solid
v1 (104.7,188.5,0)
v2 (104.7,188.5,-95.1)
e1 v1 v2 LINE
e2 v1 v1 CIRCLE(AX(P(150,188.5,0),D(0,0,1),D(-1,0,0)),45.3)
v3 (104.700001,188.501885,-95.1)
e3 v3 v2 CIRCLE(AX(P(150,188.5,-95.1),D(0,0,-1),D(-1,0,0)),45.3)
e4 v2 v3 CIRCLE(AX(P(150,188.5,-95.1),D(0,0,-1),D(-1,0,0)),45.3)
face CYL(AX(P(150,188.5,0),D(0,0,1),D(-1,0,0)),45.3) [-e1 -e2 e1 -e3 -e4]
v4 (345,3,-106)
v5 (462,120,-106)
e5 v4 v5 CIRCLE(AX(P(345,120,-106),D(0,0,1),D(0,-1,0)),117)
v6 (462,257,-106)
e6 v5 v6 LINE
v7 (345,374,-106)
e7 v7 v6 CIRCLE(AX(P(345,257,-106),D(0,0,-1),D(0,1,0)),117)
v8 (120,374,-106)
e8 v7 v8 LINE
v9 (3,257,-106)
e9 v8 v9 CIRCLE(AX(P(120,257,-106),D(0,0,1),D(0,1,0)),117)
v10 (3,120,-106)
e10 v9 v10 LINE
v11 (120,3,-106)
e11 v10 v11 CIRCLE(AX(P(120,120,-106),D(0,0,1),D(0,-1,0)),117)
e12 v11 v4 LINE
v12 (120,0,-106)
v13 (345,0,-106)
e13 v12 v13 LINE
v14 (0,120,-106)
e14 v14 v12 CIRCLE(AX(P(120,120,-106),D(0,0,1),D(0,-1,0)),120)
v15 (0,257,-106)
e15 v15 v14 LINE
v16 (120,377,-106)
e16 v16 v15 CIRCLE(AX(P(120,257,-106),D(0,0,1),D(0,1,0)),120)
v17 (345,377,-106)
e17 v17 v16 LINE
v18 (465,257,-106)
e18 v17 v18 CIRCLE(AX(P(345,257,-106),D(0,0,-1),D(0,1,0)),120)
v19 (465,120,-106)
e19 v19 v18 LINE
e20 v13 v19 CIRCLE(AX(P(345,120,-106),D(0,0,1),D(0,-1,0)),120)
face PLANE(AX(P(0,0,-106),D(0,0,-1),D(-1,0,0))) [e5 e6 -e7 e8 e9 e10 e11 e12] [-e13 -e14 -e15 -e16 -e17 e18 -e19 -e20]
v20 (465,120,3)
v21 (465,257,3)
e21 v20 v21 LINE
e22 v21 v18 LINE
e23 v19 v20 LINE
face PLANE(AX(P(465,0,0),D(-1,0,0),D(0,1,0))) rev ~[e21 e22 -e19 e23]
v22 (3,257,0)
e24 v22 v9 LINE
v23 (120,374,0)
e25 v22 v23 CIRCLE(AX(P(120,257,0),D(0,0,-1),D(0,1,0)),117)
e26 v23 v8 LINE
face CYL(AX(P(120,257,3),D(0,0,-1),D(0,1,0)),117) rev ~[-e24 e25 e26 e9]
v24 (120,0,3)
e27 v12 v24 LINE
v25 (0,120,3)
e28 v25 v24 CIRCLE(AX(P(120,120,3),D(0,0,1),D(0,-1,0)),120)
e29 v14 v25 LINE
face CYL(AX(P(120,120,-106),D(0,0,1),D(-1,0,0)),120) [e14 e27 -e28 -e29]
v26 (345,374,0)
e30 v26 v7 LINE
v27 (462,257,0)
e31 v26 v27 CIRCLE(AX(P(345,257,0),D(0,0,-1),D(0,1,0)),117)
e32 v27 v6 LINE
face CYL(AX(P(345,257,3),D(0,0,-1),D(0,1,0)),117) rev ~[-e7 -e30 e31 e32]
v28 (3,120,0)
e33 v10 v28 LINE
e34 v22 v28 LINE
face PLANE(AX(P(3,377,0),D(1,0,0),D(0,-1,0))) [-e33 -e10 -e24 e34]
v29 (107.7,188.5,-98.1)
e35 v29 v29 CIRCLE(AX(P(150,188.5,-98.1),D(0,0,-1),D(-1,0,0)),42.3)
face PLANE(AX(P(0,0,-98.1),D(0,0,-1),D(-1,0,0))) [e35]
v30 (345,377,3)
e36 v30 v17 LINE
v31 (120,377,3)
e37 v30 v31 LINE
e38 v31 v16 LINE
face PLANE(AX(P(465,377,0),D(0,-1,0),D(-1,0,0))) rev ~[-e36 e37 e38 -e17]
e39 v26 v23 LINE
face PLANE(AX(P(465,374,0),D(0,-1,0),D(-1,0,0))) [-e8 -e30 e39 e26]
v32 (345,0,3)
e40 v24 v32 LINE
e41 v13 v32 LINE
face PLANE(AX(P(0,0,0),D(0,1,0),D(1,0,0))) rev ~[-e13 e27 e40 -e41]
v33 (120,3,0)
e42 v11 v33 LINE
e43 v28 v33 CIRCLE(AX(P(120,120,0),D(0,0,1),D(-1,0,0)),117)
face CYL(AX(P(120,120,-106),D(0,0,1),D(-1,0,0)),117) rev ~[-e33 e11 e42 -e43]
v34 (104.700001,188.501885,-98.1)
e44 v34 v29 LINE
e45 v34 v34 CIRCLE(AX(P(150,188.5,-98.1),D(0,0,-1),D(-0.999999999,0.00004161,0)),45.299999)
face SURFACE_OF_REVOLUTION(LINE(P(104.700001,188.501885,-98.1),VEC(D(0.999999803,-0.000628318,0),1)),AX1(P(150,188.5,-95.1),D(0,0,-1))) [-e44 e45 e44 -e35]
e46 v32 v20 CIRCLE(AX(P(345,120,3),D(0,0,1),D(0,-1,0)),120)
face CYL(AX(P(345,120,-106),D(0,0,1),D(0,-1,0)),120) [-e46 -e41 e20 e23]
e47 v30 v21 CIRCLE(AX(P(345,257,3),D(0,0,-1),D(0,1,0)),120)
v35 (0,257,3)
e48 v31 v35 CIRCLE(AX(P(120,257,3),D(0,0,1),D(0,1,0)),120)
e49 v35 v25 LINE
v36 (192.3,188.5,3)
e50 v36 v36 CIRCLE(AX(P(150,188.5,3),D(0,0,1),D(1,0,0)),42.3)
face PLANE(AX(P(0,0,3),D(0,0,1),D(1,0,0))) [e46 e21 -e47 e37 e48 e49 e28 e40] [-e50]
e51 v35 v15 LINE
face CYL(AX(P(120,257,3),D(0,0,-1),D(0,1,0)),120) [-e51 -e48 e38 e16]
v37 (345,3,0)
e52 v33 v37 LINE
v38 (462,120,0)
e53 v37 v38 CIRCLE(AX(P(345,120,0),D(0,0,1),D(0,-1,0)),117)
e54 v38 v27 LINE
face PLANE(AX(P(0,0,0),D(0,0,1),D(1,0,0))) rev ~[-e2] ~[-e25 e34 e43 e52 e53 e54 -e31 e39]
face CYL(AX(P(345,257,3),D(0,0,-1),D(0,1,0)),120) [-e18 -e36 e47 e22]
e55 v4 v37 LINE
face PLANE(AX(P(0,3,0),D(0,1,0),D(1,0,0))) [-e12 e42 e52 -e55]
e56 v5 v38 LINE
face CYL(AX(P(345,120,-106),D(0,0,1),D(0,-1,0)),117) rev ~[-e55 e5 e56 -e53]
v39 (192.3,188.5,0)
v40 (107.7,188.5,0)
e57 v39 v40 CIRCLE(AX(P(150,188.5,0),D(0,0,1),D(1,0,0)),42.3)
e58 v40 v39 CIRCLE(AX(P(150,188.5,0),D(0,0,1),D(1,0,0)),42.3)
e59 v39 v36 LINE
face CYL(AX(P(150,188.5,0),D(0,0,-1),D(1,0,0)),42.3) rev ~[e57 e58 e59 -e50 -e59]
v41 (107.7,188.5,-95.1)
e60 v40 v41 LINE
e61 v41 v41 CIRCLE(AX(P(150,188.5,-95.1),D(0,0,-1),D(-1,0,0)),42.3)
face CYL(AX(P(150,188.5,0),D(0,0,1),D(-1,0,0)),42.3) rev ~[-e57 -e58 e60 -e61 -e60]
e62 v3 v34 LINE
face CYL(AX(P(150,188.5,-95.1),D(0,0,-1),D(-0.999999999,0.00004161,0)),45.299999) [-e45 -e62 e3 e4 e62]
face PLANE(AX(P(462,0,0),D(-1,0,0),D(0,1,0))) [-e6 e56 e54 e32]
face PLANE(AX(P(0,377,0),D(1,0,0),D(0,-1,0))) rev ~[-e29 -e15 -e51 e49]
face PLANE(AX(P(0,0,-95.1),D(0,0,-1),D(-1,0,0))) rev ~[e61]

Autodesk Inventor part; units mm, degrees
ref_plane "YZ Plane" through (0, 0, 0) normal (1, 0, 0) x (0, 1, 0)
ref_plane "XZ Plane" through (0, 0, 0) normal (0, 1, 0) x (-1, 0, 0)
ref_plane "XY Plane" through (0, 0, 0) normal (0, 0, 1) x (1, 0, 0)
sketch "Sketch1" plane through (0, 0, 0) normal (0, 0, 1) x (1, 0, 0)
  line L0 (0, 0) -> (465, 0)
  line L1 (465, 0) -> (465, 377)
  line L2 (465, 377) -> (0, 377)
  line L3 (0, 377) -> (0, 0)
  line L4 (0, 188.5) -> (465, 188.5) construction
  line L5 (150, 478.4047) -> (150, -123.5436) construction
  circle A0 centre (150, 188.5) radius 42.3
  dimension "d0" = 465
  dimension "d1" = 377
  dimension "d7" = 315
  dimension "d8" = 84.6
extrude "Extrusion1" add sketch "Sketch1" along normal blind 3
sketch "Sketch2" plane through (0, 0, 0) normal (0, 0, -1) x (-1, 0, 0)
  circle A0 centre (-150, 188.5) radius 42.3 projected
  line L0 (-465, 377) -> (0, 377)
  line L1 (0, 377) -> (0, 0)
  line L2 (0, 0) -> (-465, 0)
  line L3 (-465, 0) -> (-465, 377)
extrude "Extrusion2" add sketch "Sketch2" along normal blind 106
sketch "Sketch3" plane through (0, 0, -106) normal (0, 0, -1) x (-1, 0, 0)
  circle A0 centre (-150, 188.5) radius 42.3 projected
  circle A1 centre (-150, 188.5) radius 50.9763
extrude "Extrusion3" add sketch "Sketch3" against normal blind 10.9 contours A0
fillet "Fillet1" radius 120 4 edges at (465, 0, -51.5) (465, 377, -51.5) (0, 0, -51.5) (0, 377, -51.5)
sketch "Sketch4" plane through (0, 0, 3) normal (0, 0, 1) x (1, 0, 0)
  arc A0 (120, 377) -> (0, 257) centre (120, 257) ccw projected
  line L0 (0, 257) -> (0, 120) projected
  arc A1 (0, 120) -> (120, 0) centre (120, 120) ccw projected
  line L1 (120, 0) -> (345, 0) projected
  arc A2 (345, 0) -> (465, 120) centre (345, 120) ccw projected
  line L2 (465, 120) -> (465, 257) projected
  arc A3 (465, 257) -> (345, 377) centre (345, 257) ccw projected
  line L3 (345, 377) -> (120, 377) projected
  circle A4 centre (150, 188.5) radius 42.3 projected
  point P0 (0, 0)
shell "Shell1" thickness 3 removed faces 1 at (195, 125.6667, -106)
properties part number "Pseudo-Guitar"
